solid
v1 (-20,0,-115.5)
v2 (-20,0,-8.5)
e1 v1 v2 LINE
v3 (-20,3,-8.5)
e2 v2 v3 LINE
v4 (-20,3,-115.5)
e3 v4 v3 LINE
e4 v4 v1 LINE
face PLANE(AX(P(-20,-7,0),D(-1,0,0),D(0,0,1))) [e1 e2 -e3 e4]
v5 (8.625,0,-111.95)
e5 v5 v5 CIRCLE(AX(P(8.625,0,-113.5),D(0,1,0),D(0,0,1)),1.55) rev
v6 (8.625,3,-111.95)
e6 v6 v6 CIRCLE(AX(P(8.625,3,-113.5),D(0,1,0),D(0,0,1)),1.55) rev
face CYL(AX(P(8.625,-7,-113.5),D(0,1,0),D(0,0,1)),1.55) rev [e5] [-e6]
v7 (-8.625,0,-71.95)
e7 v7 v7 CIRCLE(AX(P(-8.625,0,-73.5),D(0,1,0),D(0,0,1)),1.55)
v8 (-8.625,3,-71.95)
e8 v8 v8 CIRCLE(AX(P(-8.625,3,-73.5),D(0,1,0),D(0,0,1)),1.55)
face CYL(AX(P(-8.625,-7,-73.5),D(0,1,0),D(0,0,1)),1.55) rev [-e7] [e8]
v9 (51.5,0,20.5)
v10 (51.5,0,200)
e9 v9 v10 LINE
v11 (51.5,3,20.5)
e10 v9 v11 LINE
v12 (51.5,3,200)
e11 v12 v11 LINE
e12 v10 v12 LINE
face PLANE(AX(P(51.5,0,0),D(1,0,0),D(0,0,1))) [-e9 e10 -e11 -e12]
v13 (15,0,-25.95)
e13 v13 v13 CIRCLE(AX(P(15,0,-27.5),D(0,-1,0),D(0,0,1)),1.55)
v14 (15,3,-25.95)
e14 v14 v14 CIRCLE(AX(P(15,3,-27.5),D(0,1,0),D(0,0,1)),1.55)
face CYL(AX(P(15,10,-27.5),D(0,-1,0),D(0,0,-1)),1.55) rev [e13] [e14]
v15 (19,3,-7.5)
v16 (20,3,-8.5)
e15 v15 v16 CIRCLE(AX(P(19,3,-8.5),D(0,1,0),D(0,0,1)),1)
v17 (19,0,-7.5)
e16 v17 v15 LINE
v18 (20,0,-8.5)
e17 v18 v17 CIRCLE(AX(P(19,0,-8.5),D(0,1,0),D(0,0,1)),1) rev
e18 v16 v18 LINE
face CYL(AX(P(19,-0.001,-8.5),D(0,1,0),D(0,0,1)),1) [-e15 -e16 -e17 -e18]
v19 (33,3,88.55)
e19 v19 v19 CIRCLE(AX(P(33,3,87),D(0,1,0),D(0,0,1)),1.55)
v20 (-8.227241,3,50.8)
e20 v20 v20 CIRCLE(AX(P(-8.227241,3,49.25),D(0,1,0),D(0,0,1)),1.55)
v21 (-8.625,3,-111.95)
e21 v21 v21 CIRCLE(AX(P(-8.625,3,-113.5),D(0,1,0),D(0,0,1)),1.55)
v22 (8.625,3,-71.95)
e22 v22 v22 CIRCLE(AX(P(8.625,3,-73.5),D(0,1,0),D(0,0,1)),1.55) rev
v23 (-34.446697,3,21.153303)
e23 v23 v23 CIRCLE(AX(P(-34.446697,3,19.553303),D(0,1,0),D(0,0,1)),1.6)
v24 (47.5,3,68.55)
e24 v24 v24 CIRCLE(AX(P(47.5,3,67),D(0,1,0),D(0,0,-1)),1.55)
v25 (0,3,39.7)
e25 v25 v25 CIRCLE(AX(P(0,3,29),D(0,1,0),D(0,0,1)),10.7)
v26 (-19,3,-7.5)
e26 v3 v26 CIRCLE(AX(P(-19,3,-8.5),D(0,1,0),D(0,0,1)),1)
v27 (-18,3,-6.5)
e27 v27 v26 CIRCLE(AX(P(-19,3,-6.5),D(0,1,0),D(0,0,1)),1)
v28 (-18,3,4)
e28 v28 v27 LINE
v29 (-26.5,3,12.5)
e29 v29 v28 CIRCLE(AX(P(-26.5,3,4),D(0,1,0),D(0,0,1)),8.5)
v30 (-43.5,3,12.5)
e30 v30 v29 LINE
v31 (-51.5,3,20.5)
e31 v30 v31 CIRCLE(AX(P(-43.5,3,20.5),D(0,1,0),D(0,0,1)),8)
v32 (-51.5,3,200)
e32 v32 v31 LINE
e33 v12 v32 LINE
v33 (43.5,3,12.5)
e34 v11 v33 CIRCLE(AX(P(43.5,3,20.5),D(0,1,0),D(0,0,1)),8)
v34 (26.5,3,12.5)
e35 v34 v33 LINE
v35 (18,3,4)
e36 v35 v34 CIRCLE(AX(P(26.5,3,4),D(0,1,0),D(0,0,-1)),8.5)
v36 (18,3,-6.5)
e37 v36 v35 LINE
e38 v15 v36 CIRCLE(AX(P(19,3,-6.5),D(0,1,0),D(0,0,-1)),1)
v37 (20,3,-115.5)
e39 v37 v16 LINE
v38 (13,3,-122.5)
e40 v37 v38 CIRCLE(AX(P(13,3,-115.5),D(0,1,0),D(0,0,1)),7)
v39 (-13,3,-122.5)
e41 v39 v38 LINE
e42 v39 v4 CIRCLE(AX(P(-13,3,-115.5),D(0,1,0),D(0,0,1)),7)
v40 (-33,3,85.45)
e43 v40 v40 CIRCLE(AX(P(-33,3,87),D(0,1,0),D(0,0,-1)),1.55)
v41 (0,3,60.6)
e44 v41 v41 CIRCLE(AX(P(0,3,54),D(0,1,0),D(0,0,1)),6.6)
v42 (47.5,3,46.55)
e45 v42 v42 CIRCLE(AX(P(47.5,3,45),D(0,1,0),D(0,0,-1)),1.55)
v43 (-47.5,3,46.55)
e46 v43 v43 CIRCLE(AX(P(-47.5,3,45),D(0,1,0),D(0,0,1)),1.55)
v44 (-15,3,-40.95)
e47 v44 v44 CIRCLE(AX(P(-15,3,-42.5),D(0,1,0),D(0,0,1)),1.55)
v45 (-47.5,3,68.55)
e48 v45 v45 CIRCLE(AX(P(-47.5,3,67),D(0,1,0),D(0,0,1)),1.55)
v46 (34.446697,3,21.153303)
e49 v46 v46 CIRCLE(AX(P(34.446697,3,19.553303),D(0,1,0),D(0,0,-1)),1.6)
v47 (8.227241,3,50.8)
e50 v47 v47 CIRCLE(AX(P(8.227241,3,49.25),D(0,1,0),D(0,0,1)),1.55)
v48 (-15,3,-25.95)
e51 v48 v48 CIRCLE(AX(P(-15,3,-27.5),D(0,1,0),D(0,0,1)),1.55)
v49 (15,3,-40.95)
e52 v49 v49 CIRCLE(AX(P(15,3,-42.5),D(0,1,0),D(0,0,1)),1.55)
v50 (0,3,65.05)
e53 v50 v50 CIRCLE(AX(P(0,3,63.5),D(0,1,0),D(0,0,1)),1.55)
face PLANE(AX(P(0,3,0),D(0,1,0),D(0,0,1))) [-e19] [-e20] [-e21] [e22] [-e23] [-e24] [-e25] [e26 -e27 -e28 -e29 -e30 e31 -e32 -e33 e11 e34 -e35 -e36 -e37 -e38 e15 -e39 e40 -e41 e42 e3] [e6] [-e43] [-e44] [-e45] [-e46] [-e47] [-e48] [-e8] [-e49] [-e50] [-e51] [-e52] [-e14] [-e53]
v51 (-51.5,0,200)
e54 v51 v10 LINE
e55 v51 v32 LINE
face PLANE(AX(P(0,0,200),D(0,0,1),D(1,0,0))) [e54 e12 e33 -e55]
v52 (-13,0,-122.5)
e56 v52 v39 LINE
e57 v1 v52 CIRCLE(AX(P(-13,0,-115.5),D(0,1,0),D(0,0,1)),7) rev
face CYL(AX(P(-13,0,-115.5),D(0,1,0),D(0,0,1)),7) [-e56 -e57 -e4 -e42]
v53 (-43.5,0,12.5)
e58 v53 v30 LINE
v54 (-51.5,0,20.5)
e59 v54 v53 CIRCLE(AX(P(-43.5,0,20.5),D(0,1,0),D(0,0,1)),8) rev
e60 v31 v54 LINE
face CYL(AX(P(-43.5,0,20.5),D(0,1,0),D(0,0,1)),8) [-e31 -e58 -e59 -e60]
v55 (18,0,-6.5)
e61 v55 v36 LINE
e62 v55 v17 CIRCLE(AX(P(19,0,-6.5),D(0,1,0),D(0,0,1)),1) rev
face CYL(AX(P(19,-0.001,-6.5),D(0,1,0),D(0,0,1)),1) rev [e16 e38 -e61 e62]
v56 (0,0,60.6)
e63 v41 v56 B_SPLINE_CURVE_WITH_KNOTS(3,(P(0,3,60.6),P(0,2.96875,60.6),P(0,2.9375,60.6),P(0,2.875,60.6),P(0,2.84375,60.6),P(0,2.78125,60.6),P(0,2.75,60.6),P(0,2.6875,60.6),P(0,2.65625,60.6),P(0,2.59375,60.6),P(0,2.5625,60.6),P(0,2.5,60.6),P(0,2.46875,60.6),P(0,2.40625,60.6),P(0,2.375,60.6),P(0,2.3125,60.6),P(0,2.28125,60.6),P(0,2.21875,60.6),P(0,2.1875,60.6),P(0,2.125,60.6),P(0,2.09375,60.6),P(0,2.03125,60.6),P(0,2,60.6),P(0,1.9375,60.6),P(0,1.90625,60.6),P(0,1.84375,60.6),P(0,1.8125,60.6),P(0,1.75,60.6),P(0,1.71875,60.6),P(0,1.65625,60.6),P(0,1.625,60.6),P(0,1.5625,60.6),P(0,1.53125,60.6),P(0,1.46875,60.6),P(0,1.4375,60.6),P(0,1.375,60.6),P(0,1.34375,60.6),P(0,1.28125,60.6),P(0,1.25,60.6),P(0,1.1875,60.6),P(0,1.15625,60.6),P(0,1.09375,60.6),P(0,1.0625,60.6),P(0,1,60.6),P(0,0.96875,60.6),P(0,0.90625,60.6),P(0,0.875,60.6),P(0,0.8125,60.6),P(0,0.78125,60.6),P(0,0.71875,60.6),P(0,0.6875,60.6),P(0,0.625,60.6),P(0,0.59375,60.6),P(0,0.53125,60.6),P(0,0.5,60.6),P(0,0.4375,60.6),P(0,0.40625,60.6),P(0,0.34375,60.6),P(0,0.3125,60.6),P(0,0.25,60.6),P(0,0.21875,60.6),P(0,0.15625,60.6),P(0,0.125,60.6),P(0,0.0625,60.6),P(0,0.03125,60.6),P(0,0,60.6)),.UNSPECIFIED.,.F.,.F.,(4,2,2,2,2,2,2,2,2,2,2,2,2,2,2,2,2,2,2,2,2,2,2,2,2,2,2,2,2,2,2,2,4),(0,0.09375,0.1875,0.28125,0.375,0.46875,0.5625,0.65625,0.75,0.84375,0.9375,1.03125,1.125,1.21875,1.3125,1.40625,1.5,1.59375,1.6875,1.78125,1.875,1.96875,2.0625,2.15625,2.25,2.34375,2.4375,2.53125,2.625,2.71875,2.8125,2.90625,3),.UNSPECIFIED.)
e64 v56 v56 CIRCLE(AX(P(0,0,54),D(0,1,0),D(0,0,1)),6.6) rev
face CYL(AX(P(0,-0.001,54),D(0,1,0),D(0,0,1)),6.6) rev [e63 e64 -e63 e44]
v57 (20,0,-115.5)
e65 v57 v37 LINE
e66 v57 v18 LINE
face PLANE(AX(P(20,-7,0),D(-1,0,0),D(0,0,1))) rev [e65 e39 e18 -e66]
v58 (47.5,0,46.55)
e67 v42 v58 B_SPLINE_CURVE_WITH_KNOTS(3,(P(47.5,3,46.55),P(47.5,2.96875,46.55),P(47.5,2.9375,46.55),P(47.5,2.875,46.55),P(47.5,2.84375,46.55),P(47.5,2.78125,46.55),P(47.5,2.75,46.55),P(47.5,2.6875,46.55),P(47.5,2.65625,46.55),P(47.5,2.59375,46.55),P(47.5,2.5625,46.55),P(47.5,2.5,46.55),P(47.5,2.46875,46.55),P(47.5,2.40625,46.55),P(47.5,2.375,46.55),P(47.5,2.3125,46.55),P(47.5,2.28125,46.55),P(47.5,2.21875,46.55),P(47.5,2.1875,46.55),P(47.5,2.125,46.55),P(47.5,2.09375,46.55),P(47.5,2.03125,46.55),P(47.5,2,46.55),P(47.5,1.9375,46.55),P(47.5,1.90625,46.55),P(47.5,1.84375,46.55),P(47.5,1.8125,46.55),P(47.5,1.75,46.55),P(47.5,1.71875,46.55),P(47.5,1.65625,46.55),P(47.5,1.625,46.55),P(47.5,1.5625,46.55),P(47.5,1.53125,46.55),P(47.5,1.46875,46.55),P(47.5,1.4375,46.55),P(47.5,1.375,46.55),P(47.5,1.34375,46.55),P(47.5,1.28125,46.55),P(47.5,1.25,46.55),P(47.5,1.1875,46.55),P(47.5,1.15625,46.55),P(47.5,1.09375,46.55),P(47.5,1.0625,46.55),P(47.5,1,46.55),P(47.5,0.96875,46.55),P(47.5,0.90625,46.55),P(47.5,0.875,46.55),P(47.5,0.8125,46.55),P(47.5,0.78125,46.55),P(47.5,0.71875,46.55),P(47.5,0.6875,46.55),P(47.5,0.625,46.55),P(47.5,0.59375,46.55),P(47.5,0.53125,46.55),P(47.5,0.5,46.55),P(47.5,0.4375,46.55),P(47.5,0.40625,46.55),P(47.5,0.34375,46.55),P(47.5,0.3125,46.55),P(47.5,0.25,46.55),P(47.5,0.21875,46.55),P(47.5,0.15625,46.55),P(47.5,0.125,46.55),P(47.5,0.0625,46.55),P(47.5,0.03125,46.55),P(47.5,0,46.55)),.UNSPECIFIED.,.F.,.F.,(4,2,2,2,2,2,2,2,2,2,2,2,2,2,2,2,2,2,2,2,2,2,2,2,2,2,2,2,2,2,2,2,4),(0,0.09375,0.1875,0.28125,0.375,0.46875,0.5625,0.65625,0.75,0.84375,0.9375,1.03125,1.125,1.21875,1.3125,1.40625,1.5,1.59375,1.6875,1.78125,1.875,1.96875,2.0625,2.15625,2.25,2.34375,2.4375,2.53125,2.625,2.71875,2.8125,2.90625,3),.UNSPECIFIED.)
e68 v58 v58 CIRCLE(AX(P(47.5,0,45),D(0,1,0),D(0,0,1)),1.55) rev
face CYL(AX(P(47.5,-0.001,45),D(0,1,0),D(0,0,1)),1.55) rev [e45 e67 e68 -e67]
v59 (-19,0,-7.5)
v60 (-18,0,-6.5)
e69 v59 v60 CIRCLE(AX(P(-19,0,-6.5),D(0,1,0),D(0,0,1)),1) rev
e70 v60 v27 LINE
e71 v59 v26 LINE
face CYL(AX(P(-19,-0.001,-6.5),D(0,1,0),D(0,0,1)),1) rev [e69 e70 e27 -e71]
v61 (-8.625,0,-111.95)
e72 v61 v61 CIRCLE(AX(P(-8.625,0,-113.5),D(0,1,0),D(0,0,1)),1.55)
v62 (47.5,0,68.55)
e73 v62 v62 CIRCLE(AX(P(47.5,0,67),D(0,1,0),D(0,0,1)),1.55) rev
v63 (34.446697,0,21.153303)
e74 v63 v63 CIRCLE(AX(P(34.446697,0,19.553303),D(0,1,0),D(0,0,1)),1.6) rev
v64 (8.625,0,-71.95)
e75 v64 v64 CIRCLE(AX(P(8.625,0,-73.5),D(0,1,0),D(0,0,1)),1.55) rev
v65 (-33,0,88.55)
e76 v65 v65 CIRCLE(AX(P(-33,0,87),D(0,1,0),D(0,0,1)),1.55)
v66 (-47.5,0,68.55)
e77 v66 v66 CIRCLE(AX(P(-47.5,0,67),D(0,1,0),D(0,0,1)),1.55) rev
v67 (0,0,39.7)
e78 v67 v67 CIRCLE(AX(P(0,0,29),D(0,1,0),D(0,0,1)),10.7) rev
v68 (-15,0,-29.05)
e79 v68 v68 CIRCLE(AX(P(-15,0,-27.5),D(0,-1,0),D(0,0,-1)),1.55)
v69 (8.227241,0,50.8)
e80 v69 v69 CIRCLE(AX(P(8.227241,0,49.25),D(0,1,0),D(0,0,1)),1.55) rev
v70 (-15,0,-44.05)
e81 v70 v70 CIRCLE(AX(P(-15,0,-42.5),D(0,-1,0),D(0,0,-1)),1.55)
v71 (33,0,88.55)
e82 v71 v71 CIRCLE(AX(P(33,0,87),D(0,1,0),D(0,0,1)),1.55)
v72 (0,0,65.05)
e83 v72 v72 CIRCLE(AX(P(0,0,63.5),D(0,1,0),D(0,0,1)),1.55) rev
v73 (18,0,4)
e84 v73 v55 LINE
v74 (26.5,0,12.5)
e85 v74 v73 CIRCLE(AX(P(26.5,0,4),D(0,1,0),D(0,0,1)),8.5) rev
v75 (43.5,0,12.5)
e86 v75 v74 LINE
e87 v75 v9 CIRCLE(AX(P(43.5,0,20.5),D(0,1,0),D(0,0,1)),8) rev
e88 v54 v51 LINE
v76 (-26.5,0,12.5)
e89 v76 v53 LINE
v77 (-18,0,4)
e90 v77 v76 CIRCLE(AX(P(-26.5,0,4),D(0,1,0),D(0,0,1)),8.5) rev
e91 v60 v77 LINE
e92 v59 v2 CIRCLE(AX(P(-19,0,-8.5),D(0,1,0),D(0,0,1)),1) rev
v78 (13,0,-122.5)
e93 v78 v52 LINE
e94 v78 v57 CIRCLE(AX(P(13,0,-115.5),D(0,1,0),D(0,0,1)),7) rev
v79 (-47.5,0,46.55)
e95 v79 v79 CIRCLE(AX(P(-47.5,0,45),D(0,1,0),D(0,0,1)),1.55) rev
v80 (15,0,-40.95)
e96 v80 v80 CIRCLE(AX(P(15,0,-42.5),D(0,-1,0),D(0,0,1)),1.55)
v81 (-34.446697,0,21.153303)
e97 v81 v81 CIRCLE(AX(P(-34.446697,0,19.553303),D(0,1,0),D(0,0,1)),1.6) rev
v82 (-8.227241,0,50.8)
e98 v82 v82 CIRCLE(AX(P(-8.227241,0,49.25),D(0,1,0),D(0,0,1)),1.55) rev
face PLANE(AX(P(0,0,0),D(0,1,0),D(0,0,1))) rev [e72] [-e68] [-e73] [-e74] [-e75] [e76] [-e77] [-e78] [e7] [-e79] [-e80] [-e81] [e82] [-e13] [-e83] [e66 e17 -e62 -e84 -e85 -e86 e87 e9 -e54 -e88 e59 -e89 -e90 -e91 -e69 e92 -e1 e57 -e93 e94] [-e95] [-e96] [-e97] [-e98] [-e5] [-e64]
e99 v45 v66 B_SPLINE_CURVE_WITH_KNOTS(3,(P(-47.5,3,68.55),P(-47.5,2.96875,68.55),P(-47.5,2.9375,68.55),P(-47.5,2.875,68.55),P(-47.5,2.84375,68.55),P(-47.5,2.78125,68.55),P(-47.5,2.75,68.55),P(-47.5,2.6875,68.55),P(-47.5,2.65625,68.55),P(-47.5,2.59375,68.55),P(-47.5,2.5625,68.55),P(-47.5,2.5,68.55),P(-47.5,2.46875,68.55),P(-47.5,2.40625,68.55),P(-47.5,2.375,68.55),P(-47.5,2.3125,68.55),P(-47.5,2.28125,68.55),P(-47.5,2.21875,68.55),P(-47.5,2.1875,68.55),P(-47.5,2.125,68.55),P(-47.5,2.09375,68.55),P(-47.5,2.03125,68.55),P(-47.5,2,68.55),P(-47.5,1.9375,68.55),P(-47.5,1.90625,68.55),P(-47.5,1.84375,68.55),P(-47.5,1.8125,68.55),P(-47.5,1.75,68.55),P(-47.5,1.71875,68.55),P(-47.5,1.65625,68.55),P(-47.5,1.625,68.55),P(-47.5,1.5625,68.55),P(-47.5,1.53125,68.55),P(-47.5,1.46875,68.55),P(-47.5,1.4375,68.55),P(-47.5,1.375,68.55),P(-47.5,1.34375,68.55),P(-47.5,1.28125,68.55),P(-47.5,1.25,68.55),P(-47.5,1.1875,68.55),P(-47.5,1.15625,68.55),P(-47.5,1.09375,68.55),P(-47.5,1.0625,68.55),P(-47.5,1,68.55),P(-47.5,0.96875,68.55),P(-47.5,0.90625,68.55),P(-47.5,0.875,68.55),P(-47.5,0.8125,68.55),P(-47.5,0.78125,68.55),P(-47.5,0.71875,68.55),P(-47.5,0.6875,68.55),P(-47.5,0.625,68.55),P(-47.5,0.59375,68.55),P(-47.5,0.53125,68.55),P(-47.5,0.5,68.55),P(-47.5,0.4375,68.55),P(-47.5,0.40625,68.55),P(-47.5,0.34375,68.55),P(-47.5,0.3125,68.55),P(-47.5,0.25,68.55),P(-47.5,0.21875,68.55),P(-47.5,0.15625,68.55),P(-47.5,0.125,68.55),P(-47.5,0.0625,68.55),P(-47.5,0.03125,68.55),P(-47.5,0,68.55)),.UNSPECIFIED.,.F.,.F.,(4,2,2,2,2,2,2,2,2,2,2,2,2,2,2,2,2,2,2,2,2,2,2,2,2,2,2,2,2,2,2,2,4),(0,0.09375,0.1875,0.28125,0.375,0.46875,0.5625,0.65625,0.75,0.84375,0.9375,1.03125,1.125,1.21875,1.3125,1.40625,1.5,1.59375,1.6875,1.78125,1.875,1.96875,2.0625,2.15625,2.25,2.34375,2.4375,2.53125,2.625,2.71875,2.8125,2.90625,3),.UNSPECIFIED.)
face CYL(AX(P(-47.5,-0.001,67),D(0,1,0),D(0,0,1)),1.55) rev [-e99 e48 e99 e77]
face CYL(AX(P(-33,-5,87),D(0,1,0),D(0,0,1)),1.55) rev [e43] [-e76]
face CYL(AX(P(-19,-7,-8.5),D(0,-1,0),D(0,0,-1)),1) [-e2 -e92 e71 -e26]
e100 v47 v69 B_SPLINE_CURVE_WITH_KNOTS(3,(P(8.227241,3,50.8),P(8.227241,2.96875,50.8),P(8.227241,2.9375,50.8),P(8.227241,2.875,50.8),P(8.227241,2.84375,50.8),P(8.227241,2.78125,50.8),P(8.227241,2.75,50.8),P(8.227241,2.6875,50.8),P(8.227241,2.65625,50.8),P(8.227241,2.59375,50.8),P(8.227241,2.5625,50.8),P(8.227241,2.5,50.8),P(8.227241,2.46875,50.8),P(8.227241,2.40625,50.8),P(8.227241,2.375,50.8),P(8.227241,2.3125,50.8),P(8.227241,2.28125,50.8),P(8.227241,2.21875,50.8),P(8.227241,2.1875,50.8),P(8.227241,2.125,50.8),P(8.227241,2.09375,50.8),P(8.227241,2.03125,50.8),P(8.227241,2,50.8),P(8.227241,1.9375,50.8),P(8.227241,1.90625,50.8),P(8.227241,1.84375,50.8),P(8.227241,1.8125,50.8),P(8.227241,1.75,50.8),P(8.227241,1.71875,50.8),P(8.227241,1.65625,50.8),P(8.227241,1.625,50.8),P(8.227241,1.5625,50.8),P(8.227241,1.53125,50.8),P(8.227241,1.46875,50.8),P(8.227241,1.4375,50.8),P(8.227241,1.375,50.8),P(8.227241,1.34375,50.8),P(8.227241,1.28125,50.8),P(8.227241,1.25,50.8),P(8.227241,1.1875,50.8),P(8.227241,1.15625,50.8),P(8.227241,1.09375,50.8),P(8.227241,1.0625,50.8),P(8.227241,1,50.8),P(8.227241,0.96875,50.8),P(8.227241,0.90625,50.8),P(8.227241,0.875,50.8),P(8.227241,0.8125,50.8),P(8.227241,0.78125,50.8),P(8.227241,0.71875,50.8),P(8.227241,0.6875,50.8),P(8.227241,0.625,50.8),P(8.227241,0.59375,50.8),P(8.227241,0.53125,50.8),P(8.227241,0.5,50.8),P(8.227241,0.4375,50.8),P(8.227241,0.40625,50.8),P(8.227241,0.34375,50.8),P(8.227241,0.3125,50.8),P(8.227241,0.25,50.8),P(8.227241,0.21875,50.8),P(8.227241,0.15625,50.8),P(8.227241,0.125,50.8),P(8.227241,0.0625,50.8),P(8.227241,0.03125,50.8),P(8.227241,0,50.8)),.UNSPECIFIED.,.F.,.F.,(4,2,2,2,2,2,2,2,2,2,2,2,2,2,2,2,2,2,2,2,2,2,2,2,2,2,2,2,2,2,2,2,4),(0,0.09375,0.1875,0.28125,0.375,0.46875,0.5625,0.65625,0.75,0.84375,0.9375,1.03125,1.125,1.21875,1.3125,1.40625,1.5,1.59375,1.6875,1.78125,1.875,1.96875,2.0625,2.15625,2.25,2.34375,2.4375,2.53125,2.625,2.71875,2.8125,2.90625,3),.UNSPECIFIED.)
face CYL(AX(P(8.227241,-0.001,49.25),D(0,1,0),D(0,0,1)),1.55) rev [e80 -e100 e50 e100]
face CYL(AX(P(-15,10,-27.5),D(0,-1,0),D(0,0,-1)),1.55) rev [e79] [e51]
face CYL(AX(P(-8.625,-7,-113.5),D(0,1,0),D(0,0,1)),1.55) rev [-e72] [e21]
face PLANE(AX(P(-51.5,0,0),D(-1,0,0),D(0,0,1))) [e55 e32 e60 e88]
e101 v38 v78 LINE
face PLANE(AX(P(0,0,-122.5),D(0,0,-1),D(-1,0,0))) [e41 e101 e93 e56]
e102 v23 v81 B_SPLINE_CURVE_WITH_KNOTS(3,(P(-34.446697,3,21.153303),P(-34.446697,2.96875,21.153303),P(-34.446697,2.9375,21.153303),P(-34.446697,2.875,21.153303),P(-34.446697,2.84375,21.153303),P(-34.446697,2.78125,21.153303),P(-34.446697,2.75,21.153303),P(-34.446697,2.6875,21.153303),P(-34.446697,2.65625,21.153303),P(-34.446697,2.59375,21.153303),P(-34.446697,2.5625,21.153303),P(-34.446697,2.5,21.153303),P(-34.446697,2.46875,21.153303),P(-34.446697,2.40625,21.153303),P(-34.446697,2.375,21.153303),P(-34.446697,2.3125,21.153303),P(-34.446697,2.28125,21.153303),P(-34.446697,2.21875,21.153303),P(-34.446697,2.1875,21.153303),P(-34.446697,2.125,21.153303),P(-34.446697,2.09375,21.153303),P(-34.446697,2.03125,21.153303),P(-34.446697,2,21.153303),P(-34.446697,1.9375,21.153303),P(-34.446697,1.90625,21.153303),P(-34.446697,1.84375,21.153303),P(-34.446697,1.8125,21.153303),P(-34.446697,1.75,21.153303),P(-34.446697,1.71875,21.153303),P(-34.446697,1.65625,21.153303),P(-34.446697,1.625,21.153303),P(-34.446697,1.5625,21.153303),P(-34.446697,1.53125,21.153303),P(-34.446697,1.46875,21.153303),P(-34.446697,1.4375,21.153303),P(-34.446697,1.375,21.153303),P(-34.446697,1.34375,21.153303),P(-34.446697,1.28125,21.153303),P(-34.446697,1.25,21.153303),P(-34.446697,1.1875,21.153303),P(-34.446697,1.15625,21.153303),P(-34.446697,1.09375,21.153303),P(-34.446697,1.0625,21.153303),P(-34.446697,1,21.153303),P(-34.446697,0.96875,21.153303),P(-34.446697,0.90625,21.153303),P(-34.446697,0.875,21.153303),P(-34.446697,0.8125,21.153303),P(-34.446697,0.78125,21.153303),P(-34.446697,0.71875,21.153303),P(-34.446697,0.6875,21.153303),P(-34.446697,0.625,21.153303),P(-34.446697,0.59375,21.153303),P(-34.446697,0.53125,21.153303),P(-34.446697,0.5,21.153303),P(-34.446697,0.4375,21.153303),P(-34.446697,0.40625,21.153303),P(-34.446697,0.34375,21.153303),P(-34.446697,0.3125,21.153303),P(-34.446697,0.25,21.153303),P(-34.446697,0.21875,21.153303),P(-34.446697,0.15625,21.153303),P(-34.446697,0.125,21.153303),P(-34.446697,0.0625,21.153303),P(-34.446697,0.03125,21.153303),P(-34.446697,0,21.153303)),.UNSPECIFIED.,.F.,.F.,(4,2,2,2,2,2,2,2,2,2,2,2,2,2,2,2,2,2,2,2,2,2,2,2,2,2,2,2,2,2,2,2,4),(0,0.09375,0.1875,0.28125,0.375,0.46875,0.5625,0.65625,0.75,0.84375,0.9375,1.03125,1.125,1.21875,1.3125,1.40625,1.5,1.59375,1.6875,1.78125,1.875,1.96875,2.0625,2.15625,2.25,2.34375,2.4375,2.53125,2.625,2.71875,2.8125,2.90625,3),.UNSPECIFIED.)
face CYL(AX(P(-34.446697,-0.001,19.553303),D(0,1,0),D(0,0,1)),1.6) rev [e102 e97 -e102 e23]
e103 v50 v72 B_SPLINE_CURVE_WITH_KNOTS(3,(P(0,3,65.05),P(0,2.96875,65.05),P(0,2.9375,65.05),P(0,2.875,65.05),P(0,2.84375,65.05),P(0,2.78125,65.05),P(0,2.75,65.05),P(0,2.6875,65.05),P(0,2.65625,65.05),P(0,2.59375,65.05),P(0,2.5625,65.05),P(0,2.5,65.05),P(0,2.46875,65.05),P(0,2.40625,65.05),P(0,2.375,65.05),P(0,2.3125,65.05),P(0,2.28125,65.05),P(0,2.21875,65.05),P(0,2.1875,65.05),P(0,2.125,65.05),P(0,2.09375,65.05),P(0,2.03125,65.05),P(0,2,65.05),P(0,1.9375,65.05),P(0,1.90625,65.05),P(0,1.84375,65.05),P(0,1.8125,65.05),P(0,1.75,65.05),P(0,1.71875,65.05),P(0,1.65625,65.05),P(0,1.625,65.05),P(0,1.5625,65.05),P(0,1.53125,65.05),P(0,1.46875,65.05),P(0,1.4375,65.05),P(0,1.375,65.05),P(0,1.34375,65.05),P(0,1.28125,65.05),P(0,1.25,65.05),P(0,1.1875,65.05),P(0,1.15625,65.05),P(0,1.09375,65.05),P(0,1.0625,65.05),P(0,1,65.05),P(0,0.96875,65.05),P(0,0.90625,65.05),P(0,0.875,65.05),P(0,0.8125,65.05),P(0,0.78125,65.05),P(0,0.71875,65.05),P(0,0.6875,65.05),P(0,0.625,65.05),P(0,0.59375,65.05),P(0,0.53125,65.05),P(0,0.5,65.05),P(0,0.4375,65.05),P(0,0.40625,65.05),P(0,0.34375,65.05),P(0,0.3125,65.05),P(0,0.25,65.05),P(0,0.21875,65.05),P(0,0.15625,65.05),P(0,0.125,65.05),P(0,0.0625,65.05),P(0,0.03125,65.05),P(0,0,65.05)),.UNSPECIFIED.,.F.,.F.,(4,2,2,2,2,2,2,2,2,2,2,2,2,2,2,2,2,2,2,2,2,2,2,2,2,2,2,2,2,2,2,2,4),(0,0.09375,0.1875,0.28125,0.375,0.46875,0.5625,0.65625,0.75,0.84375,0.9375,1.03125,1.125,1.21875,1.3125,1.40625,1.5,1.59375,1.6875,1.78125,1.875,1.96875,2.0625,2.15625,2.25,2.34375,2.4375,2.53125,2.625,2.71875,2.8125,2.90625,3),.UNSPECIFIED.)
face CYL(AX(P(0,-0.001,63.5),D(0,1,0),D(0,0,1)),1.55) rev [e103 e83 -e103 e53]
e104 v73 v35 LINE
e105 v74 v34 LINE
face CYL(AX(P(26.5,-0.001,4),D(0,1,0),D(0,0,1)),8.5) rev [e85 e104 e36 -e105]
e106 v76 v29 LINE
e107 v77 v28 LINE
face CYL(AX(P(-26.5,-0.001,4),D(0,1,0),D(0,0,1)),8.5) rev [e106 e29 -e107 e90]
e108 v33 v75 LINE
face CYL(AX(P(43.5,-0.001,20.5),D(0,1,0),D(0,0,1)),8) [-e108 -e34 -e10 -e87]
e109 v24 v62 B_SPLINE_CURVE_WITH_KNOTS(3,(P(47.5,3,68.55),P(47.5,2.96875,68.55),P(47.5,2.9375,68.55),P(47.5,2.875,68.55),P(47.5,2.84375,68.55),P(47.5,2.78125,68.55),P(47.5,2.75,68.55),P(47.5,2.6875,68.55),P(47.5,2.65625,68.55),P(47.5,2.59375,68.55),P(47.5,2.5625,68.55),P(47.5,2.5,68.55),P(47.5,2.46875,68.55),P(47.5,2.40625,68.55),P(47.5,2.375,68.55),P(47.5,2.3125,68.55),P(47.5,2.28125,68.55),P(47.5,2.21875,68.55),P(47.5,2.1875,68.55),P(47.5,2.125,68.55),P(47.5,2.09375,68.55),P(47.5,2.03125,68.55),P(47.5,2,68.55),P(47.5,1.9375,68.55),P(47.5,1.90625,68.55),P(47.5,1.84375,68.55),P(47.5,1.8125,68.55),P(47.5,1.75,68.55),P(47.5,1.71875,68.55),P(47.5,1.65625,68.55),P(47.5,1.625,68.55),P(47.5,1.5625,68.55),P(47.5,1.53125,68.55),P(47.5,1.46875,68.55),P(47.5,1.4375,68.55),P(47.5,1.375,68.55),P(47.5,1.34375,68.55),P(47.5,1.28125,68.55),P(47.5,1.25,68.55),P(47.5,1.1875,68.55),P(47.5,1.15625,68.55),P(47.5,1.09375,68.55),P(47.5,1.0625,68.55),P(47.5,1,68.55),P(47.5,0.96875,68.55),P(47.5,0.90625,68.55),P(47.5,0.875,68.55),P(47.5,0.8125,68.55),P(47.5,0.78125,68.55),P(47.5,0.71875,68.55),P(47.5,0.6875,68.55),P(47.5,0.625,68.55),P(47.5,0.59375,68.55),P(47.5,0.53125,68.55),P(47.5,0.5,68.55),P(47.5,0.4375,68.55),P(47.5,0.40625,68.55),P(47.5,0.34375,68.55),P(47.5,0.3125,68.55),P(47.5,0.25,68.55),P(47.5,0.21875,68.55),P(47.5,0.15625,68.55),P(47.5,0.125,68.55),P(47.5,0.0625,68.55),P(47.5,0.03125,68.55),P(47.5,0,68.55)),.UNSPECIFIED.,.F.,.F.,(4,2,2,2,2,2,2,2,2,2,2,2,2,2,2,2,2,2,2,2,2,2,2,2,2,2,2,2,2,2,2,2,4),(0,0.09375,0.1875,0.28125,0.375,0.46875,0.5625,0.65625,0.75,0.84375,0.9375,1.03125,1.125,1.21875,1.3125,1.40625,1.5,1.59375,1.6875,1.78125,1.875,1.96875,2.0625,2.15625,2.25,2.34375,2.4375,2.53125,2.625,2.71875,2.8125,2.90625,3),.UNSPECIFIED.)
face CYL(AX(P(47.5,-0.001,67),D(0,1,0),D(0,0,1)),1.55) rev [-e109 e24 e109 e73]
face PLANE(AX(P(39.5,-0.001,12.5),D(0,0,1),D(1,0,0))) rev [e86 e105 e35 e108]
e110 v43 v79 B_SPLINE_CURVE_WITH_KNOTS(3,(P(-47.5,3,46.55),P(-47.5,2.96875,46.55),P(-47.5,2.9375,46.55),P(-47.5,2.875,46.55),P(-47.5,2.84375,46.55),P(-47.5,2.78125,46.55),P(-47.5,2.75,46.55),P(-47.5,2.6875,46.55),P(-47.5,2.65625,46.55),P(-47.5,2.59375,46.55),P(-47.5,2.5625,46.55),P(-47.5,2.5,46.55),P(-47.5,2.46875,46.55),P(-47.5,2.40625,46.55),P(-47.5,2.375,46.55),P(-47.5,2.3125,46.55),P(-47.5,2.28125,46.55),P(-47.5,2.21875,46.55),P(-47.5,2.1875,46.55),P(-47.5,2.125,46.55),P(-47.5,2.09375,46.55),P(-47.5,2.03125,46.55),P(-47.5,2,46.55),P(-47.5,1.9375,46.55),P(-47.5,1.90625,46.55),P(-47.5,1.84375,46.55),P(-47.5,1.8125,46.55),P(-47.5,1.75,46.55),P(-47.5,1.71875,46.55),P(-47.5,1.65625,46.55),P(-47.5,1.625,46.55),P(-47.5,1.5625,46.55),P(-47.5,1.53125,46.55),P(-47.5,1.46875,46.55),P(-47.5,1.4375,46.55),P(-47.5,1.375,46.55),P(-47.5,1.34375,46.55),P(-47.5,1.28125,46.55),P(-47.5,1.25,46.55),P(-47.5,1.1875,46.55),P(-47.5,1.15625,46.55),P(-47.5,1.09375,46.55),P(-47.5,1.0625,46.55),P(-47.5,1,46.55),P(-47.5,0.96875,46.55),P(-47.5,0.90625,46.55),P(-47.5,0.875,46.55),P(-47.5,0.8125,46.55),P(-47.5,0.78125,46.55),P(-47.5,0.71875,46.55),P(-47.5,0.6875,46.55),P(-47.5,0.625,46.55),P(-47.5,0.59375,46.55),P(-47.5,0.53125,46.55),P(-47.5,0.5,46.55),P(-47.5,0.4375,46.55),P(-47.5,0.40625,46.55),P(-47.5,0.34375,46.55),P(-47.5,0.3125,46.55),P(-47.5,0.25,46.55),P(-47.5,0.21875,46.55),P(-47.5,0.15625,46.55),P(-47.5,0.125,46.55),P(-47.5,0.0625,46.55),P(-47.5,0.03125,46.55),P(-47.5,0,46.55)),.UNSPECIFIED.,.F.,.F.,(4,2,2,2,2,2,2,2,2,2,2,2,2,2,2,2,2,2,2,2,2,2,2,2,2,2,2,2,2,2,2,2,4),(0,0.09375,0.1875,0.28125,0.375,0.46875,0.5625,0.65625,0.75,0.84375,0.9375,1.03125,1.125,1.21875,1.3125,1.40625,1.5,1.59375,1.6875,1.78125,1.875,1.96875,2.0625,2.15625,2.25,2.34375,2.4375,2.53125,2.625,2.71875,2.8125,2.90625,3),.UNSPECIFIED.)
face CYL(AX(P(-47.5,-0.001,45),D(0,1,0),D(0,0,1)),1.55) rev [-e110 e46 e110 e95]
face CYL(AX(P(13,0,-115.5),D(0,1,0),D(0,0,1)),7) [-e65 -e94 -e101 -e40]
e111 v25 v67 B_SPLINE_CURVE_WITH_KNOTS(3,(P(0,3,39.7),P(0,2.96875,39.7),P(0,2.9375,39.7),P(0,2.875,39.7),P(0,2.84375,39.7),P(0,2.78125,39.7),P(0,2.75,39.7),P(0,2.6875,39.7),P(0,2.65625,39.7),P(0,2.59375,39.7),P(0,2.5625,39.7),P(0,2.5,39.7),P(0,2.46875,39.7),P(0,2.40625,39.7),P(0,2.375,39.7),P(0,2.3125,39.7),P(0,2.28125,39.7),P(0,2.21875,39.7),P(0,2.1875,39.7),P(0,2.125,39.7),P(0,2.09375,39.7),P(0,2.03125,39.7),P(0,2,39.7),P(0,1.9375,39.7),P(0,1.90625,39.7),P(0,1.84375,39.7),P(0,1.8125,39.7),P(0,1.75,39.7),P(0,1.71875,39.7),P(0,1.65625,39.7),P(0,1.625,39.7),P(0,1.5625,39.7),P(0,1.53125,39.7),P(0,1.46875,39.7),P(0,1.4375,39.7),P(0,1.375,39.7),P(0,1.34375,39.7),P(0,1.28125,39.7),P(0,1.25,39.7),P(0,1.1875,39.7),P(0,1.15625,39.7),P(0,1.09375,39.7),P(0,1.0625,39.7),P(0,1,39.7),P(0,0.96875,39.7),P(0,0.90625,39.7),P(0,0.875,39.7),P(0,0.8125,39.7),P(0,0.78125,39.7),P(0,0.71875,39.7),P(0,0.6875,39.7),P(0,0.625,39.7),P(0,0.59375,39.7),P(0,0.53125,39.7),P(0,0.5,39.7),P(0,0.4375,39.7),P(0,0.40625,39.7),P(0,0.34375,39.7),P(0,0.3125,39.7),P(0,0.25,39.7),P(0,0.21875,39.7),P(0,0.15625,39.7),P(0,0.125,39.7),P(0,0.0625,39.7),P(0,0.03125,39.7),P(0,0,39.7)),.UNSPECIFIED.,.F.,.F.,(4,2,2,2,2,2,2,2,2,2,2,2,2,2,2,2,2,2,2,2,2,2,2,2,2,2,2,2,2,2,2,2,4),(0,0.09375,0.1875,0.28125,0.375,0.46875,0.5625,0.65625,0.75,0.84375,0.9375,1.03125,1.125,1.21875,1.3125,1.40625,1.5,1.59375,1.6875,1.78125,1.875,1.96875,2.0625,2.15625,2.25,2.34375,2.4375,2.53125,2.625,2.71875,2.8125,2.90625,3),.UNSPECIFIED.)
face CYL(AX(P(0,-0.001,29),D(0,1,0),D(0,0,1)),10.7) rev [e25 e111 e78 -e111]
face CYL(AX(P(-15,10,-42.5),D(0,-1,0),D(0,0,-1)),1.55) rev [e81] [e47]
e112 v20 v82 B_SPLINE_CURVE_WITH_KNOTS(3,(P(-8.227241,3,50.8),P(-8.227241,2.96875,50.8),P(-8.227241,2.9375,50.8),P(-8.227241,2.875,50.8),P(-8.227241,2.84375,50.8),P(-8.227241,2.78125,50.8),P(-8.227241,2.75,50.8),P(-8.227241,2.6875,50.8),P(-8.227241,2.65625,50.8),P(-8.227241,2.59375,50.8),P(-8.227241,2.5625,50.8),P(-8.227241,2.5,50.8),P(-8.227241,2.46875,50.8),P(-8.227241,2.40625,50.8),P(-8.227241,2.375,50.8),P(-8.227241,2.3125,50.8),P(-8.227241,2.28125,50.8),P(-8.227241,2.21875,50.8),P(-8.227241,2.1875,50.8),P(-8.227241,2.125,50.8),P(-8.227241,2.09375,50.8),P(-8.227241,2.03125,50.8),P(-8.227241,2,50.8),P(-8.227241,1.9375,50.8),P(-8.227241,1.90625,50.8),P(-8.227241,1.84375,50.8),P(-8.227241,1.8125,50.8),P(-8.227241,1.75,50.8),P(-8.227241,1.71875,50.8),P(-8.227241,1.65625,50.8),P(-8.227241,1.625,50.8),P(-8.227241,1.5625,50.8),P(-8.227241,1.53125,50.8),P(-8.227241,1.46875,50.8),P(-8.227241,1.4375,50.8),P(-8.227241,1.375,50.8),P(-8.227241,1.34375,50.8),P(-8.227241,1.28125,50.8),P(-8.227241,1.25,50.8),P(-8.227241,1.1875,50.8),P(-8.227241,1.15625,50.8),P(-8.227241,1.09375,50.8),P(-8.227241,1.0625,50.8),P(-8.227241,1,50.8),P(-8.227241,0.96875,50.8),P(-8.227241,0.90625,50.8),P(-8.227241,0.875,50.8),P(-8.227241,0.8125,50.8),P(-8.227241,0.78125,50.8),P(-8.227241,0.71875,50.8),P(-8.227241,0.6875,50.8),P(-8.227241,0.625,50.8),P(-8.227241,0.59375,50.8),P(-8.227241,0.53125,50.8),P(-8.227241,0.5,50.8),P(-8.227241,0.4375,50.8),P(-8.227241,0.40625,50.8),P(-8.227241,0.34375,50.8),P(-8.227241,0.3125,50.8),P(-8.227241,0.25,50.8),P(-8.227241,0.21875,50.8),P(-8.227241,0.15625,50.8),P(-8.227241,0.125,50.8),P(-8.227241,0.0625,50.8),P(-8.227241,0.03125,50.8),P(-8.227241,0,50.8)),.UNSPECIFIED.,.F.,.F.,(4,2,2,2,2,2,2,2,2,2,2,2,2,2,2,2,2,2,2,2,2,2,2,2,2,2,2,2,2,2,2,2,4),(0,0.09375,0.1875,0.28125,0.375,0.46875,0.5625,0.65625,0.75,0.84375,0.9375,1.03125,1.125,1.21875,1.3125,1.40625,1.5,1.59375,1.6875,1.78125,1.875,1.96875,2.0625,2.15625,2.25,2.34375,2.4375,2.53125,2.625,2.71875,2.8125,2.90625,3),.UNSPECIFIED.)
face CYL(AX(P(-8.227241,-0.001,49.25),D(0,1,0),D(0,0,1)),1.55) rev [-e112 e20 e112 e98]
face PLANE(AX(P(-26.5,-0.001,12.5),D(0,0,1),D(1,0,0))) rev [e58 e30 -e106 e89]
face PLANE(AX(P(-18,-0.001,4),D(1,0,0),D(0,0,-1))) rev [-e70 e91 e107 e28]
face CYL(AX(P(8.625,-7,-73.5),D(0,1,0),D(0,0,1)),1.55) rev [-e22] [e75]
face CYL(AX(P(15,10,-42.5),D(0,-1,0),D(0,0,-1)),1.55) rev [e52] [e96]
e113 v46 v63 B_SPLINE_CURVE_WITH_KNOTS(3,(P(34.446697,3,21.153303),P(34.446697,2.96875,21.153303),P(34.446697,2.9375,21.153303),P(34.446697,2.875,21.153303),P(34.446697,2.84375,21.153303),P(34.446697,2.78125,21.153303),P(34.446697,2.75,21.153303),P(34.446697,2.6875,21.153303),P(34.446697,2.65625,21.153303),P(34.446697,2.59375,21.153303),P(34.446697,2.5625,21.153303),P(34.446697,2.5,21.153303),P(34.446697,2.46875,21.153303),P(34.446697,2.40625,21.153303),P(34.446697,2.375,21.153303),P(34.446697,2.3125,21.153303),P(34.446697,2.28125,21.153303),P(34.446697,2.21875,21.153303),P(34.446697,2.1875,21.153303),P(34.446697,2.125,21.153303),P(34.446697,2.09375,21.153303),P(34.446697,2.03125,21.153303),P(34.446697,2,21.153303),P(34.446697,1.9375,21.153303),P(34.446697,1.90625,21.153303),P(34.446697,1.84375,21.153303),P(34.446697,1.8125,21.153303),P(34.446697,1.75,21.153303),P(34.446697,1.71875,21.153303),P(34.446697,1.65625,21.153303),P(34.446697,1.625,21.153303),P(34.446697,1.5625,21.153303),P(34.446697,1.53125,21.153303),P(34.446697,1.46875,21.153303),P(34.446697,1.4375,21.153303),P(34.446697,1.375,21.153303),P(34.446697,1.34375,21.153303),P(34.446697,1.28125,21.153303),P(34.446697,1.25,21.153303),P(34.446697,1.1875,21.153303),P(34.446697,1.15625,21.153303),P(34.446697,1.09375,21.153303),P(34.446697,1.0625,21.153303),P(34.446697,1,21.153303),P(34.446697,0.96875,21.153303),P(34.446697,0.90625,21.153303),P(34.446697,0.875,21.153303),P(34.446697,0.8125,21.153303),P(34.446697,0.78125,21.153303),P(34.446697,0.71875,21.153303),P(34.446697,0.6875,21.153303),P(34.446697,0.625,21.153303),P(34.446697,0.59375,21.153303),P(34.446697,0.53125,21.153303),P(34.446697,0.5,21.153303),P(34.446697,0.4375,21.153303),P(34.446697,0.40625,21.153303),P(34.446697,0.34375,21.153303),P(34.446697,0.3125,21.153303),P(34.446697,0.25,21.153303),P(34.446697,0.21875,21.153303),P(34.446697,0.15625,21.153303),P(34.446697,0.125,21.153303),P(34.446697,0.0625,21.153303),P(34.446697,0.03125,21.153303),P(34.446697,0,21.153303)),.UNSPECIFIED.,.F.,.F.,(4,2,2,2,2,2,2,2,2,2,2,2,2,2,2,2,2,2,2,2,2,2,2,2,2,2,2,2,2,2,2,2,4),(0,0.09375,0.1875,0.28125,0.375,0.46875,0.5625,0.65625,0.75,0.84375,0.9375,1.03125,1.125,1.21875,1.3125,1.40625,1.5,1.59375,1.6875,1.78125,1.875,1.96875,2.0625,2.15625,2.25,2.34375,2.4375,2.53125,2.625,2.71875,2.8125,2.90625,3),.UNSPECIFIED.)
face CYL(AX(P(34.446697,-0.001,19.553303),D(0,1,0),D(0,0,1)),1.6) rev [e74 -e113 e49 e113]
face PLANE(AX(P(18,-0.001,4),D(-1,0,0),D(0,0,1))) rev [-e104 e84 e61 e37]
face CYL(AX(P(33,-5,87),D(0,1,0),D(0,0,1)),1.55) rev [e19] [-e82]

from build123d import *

# Parameters (mm, degrees)
SKETCH_1_W              = 200
SKETCH_1_H              = 200
EXTRUDE_1_DEPTH         = 3
SKETCH_2_R              = 1.5
CUT_EXTRUDE_2_DEPTH     = 10
CUT_EXTRUDE_3_DEPTH     = 10
SKETCH_6_R              = 1.55
CUT_EXTRUDE_3_1_1_DEPTH = 10
CUT_EXTRUDE_6_REACH     = 111.495
SKETCH_11_R             = 1.5
CUT_EXTRUDE_21_4_REACH  = 111.495
SKETCH_4_R              = 10.7
FILLET_1_R              = 1
SKETCH_12_W             = 40
SKETCH_12_H             = 3
EXTRUDE_2_DEPTH         = 75
FILLET_2_R              = 7
SKETCH_13_R             = 1.55
CUT_EXTRUDE_3_1_3_DEPTH = 10
CUT_EXTRUDE_2006_REACH  = 132.367
SKETCH_14_R             = 1.55
SKETCH_14_R_2           = 6.6
SKETCH_18_R             = 1.55
CUT_EXTRUDE_2_2_DEPTH   = 8
SKETCH_19_W             = 89
SKETCH_19_H             = 3
EXTRUDE_3_DEPTH         = 100
SKETCH_20_W             = 187.5
SKETCH_20_H             = 3
EXTRUDE_4_DEPTH         = 7
FILLET_3_R              = 8
CUT_EXTRUDE_9693_REACH  = 208.546
SKETCH_17_R             = 1.55
CUT_EXTRUDE_10600_REACH = 208.546
SKETCH_16_R             = 1.6


with BuildPart() as part:
    # 草图1 → 凸台-拉伸1 (new body)
    with BuildSketch(Plane(origin=(0, 0, 0), x_dir=(1, 0, 0), z_dir=(0, 1, 0))):
        Rectangle(SKETCH_1_W, SKETCH_1_H)
    extrude(amount=EXTRUDE_1_DEPTH)

    # 草图2 → Cut-Extrude 2 (cut)
    with BuildSketch(Plane(origin=(0, 3, 0), x_dir=(1, 0, 0), z_dir=(0, 1, 0))):
        with Locations(Location((29.5, 9.5, 0), (0, 0, 270))):
            Circle(SKETCH_2_R)
        with Locations(Location((21.5, 0, 0), (0, 0, 270))):
            Circle(SKETCH_2_R)
        with Locations(Location((29.5, -9.5, 0), (0, 0, 270))):
            Circle(SKETCH_2_R)
        with Locations(Location((37.5, 0, 0), (0, 0, 270))):
            Circle(SKETCH_2_R)
        with Locations(Location((-29.5, -9.5, 0), (0, 0, 270))):
            Circle(SKETCH_2_R)
        with Locations(Location((-37.5, 0, 0), (0, 0, 270))):
            Circle(SKETCH_2_R)
        with Locations(Location((-21.5, 0, 0), (0, 0, 270))):
            Circle(SKETCH_2_R)
        with Locations(Location((-29.5, 9.5, 0), (0, 0, 270))):
            Circle(SKETCH_2_R)
    extrude(amount=-CUT_EXTRUDE_2_DEPTH, mode=Mode.SUBTRACT)

    # 草图5 → 切除-拉伸3 (cut)
    with BuildSketch(Plane(origin=(0, 3, 0), x_dir=(1, 0, 0), z_dir=(0, 1, 0))):
        with BuildLine():
            Line((-100, -100), (-44.5, -100))
            Line((-44.5, -100), (-44.5, 0))
            ThreePointArc((-44.5, 0), (-40.212142643, 10.5), (-29.8, 14.9969997))
            ThreePointArc((-29.8, 14.9969997), (-22.858571571, 17.9949995), (-20, 24.9949995))
            Line((-20, 24.9949995), (-20, 47.5))
            Line((-20, 47.5), (0, 47.5))
            Line((0, 47.5), (20, 47.5))
            Line((20, 47.5), (20, 24.9949995))
            ThreePointArc((20, 24.9949995), (22.858571571, 17.9949995), (29.8, 14.9969997))
            ThreePointArc((29.8, 14.9969997), (40.212142643, 10.5), (44.5, 0))
            Line((44.5, 0), (44.5, -100))
            Line((44.5, -100), (100, -100))
            Line((100, -100), (100, 100))
            Line((100, 100), (-100, 100))
            Line((-100, 100), (-100, -100))
        make_face()
    extrude(amount=-CUT_EXTRUDE_3_DEPTH, mode=Mode.SUBTRACT)

    # 草图6 → φ3.1通孔1 (cut)
    with BuildSketch(Plane.XZ):
        with Locations(Location((-15, -42.5, 0), (0, 0, 270))):
            Circle(SKETCH_6_R)
        with Locations(Location((-15, -27.5, 0), (0, 0, 270))):
            Circle(SKETCH_6_R)
        with Locations(Location((15, -27.5, 0), (0, 0, 90))):
            Circle(SKETCH_6_R)
        with Locations(Location((15, -42.5, 0), (0, 0, 90))):
            Circle(SKETCH_6_R)
    extrude(amount=-CUT_EXTRUDE_3_1_1_DEPTH, mode=Mode.SUBTRACT)

    # 草图11 → 切除-拉伸6 (cut, up to next)
    with BuildSketch(Plane(origin=(0, 3, 0), x_dir=(1, 0, 0), z_dir=(0, 1, 0)), mode=Mode.PRIVATE) as cut_extrude_6_sk1:
        with BuildLine():
            Line((44.5, -17.5), (44.5, -100))
            Line((44.5, -100), (101.133062566, -100))
            Line((101.133062566, -100), (101.133062566, 47.5))
            Line((101.133062566, 47.5), (20, 47.5))
            Line((20, 47.5), (20, 7.5))
            Line((20, 7.5), (19, 7.5))
            ThreePointArc((19, 7.5), (18.292893219, 7.207106781), (18, 6.5))
            Line((18, 6.5), (18, -4))
            ThreePointArc((18, -4), (20.48959236, -10.01040764), (26.5, -12.5))
            Line((26.5, -12.5), (39.5, -12.5))
            Line((39.5, -12.5), (44.5, -12.5))
            Line((44.5, -12.5), (44.5, -17.5))
        make_face()
        with Locations((29.5, -9.5)):
            Circle(SKETCH_11_R, mode=Mode.SUBTRACT)
        with Locations((21.5, 0)):
            Circle(SKETCH_11_R, mode=Mode.SUBTRACT)
    cut_extrude_6_tool1 = extrude(cut_extrude_6_sk1.sketch, amount=-CUT_EXTRUDE_6_REACH, mode=Mode.PRIVATE) & part.part
    # 草图11 → 切除-拉伸6 (cut, up to next)
    with BuildSketch(Plane(origin=(0, 3, 0), x_dir=(1, 0, 0), z_dir=(0, 1, 0)), mode=Mode.PRIVATE) as cut_extrude_6_sk2:
        with BuildLine():
            Line((-44.5, -17.5), (-44.5, -100))
            Line((-44.5, -100), (-101.133062566, -100))
            Line((-101.133062566, -100), (-101.133062566, 47.5))
            Line((-101.133062566, 47.5), (-20, 47.5))
            Line((-20, 47.5), (-20, 7.5))
            Line((-20, 7.5), (-19, 7.5))
            ThreePointArc((-19, 7.5), (-18.292893219, 7.207106781), (-18, 6.5))
            Line((-18, 6.5), (-18, -4))
            ThreePointArc((-18, -4), (-20.48959236, -10.01040764), (-26.5, -12.5))
            Line((-26.5, -12.5), (-39.5, -12.5))
            Line((-39.5, -12.5), (-44.5, -12.5))
            Line((-44.5, -12.5), (-44.5, -17.5))
        make_face()
    cut_extrude_6_tool2 = extrude(cut_extrude_6_sk2.sketch, amount=-CUT_EXTRUDE_6_REACH, mode=Mode.PRIVATE) & part.part
    add(cut_extrude_6_tool1.solids().sort_by_distance((66.686037, 3, 19.669577))[0], mode=Mode.SUBTRACT)
    add(cut_extrude_6_tool2.solids().sort_by_distance((-66.626911, 3, 19.648158))[0], mode=Mode.SUBTRACT)

    # 草图4 → φ21.4落弹孔 (cut, up to next)
    with BuildSketch(Plane(origin=(0, 3, 0), x_dir=(1, 0, 0), z_dir=(0, 1, 0)), mode=Mode.PRIVATE) as cut_extrude_21_4_sk1:
        with Locations(Location((0, -29, 0), (0, 0, 270))):
            Circle(SKETCH_4_R)
    cut_extrude_21_4_tool1 = extrude(cut_extrude_21_4_sk1.sketch, amount=-CUT_EXTRUDE_21_4_REACH, mode=Mode.PRIVATE) & part.part
    add(cut_extrude_21_4_tool1.solids().sort_by_distance((0, 3, 29))[0], mode=Mode.SUBTRACT)

    # 圆角1
    fillet_1_edges = [part.edges().sort_by_distance(p)[0] for p in [
        (-20, 1.5, -7.5),
        (20, 1.5, -7.5),
    ]]
    fillet(fillet_1_edges, radius=FILLET_1_R - 0.0001)  # a hair under: the kernel refuses the full size

    # 草图12 → 凸台-拉伸2 (add)
    with BuildSketch(Plane(origin=(0, 0, -47.5), x_dir=(-1, 0, 0), z_dir=(0, 0, -1))):
        with Locations((0, 1.5)):
            Rectangle(SKETCH_12_W, SKETCH_12_H)
    extrude(amount=EXTRUDE_2_DEPTH)

    # 圆角2
    fillet_2_edges = [part.edges().sort_by_distance(p)[0] for p in [
        (20, 1.5, -122.5),
        (-20, 1.5, -122.5),
    ]]
    fillet(fillet_2_edges, radius=FILLET_2_R)

    # 草图13 → φ3.1通孔3 (cut)
    with BuildSketch(Plane(origin=(0, 3, 0), x_dir=(1, 0, 0), z_dir=(0, 1, 0))):
        with Locations(Location((-8.625, 113.5, 0), (0, 0, 270))):
            Circle(SKETCH_13_R)
        with Locations(Location((8.625, 113.5, 0), (0, 0, 270))):
            Circle(SKETCH_13_R)
        with Locations(Location((8.625, 73.5, 0), (0, 0, 270))):
            Circle(SKETCH_13_R)
        with Locations(Location((-8.625, 73.5, 0), (0, 0, 270))):
            Circle(SKETCH_13_R)
    extrude(amount=-CUT_EXTRUDE_3_1_3_DEPTH, mode=Mode.SUBTRACT)

    # 草图14 → 2006电机固定 (cut, up to next)
    with BuildSketch(Plane(origin=(0, 3, 0), x_dir=(1, 0, 0), z_dir=(0, 1, 0)), mode=Mode.PRIVATE) as cut_extrude_2006_sk1:
        with Locations(Location((0, -63.5, 0), (0, 0, 270))):
            Circle(SKETCH_14_R)
    cut_extrude_2006_tool1 = extrude(cut_extrude_2006_sk1.sketch, amount=-CUT_EXTRUDE_2006_REACH, mode=Mode.PRIVATE) & part.part
    # 草图14 → 2006电机固定 (cut, up to next)
    with BuildSketch(Plane(origin=(0, 3, 0), x_dir=(1, 0, 0), z_dir=(0, 1, 0)), mode=Mode.PRIVATE) as cut_extrude_2006_sk2:
        with Locations(Location((-8.227241336, -49.25, 0), (0, 0, 270))):
            Circle(SKETCH_14_R)
    cut_extrude_2006_tool2 = extrude(cut_extrude_2006_sk2.sketch, amount=-CUT_EXTRUDE_2006_REACH, mode=Mode.PRIVATE) & part.part
    # 草图14 → 2006电机固定 (cut, up to next)
    with BuildSketch(Plane(origin=(0, 3, 0), x_dir=(1, 0, 0), z_dir=(0, 1, 0)), mode=Mode.PRIVATE) as cut_extrude_2006_sk3:
        with Locations(Location((8.227241336, -49.25, 0), (0, 0, 270))):
            Circle(SKETCH_14_R)
    cut_extrude_2006_tool3 = extrude(cut_extrude_2006_sk3.sketch, amount=-CUT_EXTRUDE_2006_REACH, mode=Mode.PRIVATE) & part.part
    # 草图14 → 2006电机固定 (cut, up to next)
    with BuildSketch(Plane(origin=(0, 3, 0), x_dir=(1, 0, 0), z_dir=(0, 1, 0)), mode=Mode.PRIVATE) as cut_extrude_2006_sk4:
        with Locations(Location((0, -54, 0), (0, 0, 270))):
            Circle(SKETCH_14_R_2)
    cut_extrude_2006_tool4 = extrude(cut_extrude_2006_sk4.sketch, amount=-CUT_EXTRUDE_2006_REACH, mode=Mode.PRIVATE) & part.part
    add(cut_extrude_2006_tool1.solids().sort_by_distance((0, 3, 63.5))[0], mode=Mode.SUBTRACT)
    add(cut_extrude_2006_tool2.solids().sort_by_distance((-8.227241, 3, 49.25))[0], mode=Mode.SUBTRACT)
    add(cut_extrude_2006_tool3.solids().sort_by_distance((8.227241, 3, 49.25))[0], mode=Mode.SUBTRACT)
    add(cut_extrude_2006_tool4.solids().sort_by_distance((0, 3, 54))[0], mode=Mode.SUBTRACT)

    # 草图18 → Cut-Extrude 2 2 (cut)
    with BuildSketch(Plane(origin=(0, 3, 0), x_dir=(1, 0, 0), z_dir=(0, 1, 0))):
        with Locations(Location((33, -87, 0), (0, 0, 270))):
            Circle(SKETCH_18_R)
        with Locations(Location((-33, -87, 0), (0, 0, 270))):
            Circle(SKETCH_18_R)
    extrude(amount=-CUT_EXTRUDE_2_2_DEPTH, mode=Mode.SUBTRACT)

    # 草图19 → 凸台-拉伸3 (add)
    with BuildSketch(Plane.XY.offset(100)):
        with Locations((0, 1.5)):
            Rectangle(SKETCH_19_W, SKETCH_19_H)
    extrude(amount=EXTRUDE_3_DEPTH)

    # 草图20 → 凸台-拉伸4 (add)
    with BuildSketch(Plane.ZY.offset(44.5)):
        with Locations((106.25, 1.5)):
            Rectangle(SKETCH_20_W, SKETCH_20_H)
    extrude_4 = extrude(amount=EXTRUDE_4_DEPTH)

    # 镜向2: 凸台-拉伸4 across plane
    add(extrude_4.mirror(Plane(origin=(0, 0, 0), x_dir=(0, 0, 1), z_dir=(1, 0, 0))))

    # 圆角3
    fillet_3_edges = [part.edges().sort_by_distance(p)[0] for p in [
        (-51.5, 1.5, 12.5),
        (51.5, 1.5, 12.5),
    ]]
    fillet(fillet_3_edges, radius=FILLET_3_R)

    # 草图17 → Cut-Extrude 9693 (cut, up to next)
    with BuildSketch(Plane(origin=(0, 3, 0), x_dir=(1, 0, 0), z_dir=(0, 1, 0)), mode=Mode.PRIVATE) as cut_extrude_9693_sk1:
        with Locations(Location((-47.5, -45, 0), (0, 0, 270))):
            Circle(SKETCH_17_R)
    cut_extrude_9693_tool1 = extrude(cut_extrude_9693_sk1.sketch, amount=-CUT_EXTRUDE_9693_REACH, mode=Mode.PRIVATE) & part.part
    # 草图17 → Cut-Extrude 9693 (cut, up to next)
    with BuildSketch(Plane(origin=(0, 3, 0), x_dir=(1, 0, 0), z_dir=(0, 1, 0)), mode=Mode.PRIVATE) as cut_extrude_9693_sk2:
        with Locations(Location((-47.5, -67, 0), (0, 0, 270))):
            Circle(SKETCH_17_R)
    cut_extrude_9693_tool2 = extrude(cut_extrude_9693_sk2.sketch, amount=-CUT_EXTRUDE_9693_REACH, mode=Mode.PRIVATE) & part.part
    # 草图17 → Cut-Extrude 9693 (cut, up to next)
    with BuildSketch(Plane(origin=(0, 3, 0), x_dir=(1, 0, 0), z_dir=(0, 1, 0)), mode=Mode.PRIVATE) as cut_extrude_9693_sk3:
        with Locations(Location((47.5, -67, 0), (0, 0, 270))):
            Circle(SKETCH_17_R)
    cut_extrude_9693_tool3 = extrude(cut_extrude_9693_sk3.sketch, amount=-CUT_EXTRUDE_9693_REACH, mode=Mode.PRIVATE) & part.part
    # 草图17 → Cut-Extrude 9693 (cut, up to next)
    with BuildSketch(Plane(origin=(0, 3, 0), x_dir=(1, 0, 0), z_dir=(0, 1, 0)), mode=Mode.PRIVATE) as cut_extrude_9693_sk4:
        with Locations(Location((47.5, -45, 0), (0, 0, 270))):
            Circle(SKETCH_17_R)
    cut_extrude_9693_tool4 = extrude(cut_extrude_9693_sk4.sketch, amount=-CUT_EXTRUDE_9693_REACH, mode=Mode.PRIVATE) & part.part
    add(cut_extrude_9693_tool1.solids().sort_by_distance((-47.5, 3, 45))[0], mode=Mode.SUBTRACT)
    add(cut_extrude_9693_tool2.solids().sort_by_distance((-47.5, 3, 67))[0], mode=Mode.SUBTRACT)
    add(cut_extrude_9693_tool3.solids().sort_by_distance((47.5, 3, 67))[0], mode=Mode.SUBTRACT)
    add(cut_extrude_9693_tool4.solids().sort_by_distance((47.5, 3, 45))[0], mode=Mode.SUBTRACT)

    # 草图16 → Cut-Extrude 10600 (cut, up to next)
    with BuildSketch(Plane(origin=(0, 3, 0), x_dir=(1, 0, 0), z_dir=(0, 1, 0)), mode=Mode.PRIVATE) as cut_extrude_10600_sk1:
        with Locations(Location((-34.446696938, -19.553303062, 0), (0, 0, 270))):
            Circle(SKETCH_16_R)
    cut_extrude_10600_tool1 = extrude(cut_extrude_10600_sk1.sketch, amount=-CUT_EXTRUDE_10600_REACH, mode=Mode.PRIVATE) & part.part
    # 草图16 → Cut-Extrude 10600 (cut, up to next)
    with BuildSketch(Plane(origin=(0, 3, 0), x_dir=(1, 0, 0), z_dir=(0, 1, 0)), mode=Mode.PRIVATE) as cut_extrude_10600_sk2:
        with Locations(Location((34.446696938, -19.553303062, 0), (0, 0, 270))):
            Circle(SKETCH_16_R)
    cut_extrude_10600_tool2 = extrude(cut_extrude_10600_sk2.sketch, amount=-CUT_EXTRUDE_10600_REACH, mode=Mode.PRIVATE) & part.part
    add(cut_extrude_10600_tool1.solids().sort_by_distance((-34.446697, 3, 19.553303))[0], mode=Mode.SUBTRACT)
    add(cut_extrude_10600_tool2.solids().sort_by_distance((34.446697, 3, 19.553303))[0], mode=Mode.SUBTRACT)


solid = part.part
